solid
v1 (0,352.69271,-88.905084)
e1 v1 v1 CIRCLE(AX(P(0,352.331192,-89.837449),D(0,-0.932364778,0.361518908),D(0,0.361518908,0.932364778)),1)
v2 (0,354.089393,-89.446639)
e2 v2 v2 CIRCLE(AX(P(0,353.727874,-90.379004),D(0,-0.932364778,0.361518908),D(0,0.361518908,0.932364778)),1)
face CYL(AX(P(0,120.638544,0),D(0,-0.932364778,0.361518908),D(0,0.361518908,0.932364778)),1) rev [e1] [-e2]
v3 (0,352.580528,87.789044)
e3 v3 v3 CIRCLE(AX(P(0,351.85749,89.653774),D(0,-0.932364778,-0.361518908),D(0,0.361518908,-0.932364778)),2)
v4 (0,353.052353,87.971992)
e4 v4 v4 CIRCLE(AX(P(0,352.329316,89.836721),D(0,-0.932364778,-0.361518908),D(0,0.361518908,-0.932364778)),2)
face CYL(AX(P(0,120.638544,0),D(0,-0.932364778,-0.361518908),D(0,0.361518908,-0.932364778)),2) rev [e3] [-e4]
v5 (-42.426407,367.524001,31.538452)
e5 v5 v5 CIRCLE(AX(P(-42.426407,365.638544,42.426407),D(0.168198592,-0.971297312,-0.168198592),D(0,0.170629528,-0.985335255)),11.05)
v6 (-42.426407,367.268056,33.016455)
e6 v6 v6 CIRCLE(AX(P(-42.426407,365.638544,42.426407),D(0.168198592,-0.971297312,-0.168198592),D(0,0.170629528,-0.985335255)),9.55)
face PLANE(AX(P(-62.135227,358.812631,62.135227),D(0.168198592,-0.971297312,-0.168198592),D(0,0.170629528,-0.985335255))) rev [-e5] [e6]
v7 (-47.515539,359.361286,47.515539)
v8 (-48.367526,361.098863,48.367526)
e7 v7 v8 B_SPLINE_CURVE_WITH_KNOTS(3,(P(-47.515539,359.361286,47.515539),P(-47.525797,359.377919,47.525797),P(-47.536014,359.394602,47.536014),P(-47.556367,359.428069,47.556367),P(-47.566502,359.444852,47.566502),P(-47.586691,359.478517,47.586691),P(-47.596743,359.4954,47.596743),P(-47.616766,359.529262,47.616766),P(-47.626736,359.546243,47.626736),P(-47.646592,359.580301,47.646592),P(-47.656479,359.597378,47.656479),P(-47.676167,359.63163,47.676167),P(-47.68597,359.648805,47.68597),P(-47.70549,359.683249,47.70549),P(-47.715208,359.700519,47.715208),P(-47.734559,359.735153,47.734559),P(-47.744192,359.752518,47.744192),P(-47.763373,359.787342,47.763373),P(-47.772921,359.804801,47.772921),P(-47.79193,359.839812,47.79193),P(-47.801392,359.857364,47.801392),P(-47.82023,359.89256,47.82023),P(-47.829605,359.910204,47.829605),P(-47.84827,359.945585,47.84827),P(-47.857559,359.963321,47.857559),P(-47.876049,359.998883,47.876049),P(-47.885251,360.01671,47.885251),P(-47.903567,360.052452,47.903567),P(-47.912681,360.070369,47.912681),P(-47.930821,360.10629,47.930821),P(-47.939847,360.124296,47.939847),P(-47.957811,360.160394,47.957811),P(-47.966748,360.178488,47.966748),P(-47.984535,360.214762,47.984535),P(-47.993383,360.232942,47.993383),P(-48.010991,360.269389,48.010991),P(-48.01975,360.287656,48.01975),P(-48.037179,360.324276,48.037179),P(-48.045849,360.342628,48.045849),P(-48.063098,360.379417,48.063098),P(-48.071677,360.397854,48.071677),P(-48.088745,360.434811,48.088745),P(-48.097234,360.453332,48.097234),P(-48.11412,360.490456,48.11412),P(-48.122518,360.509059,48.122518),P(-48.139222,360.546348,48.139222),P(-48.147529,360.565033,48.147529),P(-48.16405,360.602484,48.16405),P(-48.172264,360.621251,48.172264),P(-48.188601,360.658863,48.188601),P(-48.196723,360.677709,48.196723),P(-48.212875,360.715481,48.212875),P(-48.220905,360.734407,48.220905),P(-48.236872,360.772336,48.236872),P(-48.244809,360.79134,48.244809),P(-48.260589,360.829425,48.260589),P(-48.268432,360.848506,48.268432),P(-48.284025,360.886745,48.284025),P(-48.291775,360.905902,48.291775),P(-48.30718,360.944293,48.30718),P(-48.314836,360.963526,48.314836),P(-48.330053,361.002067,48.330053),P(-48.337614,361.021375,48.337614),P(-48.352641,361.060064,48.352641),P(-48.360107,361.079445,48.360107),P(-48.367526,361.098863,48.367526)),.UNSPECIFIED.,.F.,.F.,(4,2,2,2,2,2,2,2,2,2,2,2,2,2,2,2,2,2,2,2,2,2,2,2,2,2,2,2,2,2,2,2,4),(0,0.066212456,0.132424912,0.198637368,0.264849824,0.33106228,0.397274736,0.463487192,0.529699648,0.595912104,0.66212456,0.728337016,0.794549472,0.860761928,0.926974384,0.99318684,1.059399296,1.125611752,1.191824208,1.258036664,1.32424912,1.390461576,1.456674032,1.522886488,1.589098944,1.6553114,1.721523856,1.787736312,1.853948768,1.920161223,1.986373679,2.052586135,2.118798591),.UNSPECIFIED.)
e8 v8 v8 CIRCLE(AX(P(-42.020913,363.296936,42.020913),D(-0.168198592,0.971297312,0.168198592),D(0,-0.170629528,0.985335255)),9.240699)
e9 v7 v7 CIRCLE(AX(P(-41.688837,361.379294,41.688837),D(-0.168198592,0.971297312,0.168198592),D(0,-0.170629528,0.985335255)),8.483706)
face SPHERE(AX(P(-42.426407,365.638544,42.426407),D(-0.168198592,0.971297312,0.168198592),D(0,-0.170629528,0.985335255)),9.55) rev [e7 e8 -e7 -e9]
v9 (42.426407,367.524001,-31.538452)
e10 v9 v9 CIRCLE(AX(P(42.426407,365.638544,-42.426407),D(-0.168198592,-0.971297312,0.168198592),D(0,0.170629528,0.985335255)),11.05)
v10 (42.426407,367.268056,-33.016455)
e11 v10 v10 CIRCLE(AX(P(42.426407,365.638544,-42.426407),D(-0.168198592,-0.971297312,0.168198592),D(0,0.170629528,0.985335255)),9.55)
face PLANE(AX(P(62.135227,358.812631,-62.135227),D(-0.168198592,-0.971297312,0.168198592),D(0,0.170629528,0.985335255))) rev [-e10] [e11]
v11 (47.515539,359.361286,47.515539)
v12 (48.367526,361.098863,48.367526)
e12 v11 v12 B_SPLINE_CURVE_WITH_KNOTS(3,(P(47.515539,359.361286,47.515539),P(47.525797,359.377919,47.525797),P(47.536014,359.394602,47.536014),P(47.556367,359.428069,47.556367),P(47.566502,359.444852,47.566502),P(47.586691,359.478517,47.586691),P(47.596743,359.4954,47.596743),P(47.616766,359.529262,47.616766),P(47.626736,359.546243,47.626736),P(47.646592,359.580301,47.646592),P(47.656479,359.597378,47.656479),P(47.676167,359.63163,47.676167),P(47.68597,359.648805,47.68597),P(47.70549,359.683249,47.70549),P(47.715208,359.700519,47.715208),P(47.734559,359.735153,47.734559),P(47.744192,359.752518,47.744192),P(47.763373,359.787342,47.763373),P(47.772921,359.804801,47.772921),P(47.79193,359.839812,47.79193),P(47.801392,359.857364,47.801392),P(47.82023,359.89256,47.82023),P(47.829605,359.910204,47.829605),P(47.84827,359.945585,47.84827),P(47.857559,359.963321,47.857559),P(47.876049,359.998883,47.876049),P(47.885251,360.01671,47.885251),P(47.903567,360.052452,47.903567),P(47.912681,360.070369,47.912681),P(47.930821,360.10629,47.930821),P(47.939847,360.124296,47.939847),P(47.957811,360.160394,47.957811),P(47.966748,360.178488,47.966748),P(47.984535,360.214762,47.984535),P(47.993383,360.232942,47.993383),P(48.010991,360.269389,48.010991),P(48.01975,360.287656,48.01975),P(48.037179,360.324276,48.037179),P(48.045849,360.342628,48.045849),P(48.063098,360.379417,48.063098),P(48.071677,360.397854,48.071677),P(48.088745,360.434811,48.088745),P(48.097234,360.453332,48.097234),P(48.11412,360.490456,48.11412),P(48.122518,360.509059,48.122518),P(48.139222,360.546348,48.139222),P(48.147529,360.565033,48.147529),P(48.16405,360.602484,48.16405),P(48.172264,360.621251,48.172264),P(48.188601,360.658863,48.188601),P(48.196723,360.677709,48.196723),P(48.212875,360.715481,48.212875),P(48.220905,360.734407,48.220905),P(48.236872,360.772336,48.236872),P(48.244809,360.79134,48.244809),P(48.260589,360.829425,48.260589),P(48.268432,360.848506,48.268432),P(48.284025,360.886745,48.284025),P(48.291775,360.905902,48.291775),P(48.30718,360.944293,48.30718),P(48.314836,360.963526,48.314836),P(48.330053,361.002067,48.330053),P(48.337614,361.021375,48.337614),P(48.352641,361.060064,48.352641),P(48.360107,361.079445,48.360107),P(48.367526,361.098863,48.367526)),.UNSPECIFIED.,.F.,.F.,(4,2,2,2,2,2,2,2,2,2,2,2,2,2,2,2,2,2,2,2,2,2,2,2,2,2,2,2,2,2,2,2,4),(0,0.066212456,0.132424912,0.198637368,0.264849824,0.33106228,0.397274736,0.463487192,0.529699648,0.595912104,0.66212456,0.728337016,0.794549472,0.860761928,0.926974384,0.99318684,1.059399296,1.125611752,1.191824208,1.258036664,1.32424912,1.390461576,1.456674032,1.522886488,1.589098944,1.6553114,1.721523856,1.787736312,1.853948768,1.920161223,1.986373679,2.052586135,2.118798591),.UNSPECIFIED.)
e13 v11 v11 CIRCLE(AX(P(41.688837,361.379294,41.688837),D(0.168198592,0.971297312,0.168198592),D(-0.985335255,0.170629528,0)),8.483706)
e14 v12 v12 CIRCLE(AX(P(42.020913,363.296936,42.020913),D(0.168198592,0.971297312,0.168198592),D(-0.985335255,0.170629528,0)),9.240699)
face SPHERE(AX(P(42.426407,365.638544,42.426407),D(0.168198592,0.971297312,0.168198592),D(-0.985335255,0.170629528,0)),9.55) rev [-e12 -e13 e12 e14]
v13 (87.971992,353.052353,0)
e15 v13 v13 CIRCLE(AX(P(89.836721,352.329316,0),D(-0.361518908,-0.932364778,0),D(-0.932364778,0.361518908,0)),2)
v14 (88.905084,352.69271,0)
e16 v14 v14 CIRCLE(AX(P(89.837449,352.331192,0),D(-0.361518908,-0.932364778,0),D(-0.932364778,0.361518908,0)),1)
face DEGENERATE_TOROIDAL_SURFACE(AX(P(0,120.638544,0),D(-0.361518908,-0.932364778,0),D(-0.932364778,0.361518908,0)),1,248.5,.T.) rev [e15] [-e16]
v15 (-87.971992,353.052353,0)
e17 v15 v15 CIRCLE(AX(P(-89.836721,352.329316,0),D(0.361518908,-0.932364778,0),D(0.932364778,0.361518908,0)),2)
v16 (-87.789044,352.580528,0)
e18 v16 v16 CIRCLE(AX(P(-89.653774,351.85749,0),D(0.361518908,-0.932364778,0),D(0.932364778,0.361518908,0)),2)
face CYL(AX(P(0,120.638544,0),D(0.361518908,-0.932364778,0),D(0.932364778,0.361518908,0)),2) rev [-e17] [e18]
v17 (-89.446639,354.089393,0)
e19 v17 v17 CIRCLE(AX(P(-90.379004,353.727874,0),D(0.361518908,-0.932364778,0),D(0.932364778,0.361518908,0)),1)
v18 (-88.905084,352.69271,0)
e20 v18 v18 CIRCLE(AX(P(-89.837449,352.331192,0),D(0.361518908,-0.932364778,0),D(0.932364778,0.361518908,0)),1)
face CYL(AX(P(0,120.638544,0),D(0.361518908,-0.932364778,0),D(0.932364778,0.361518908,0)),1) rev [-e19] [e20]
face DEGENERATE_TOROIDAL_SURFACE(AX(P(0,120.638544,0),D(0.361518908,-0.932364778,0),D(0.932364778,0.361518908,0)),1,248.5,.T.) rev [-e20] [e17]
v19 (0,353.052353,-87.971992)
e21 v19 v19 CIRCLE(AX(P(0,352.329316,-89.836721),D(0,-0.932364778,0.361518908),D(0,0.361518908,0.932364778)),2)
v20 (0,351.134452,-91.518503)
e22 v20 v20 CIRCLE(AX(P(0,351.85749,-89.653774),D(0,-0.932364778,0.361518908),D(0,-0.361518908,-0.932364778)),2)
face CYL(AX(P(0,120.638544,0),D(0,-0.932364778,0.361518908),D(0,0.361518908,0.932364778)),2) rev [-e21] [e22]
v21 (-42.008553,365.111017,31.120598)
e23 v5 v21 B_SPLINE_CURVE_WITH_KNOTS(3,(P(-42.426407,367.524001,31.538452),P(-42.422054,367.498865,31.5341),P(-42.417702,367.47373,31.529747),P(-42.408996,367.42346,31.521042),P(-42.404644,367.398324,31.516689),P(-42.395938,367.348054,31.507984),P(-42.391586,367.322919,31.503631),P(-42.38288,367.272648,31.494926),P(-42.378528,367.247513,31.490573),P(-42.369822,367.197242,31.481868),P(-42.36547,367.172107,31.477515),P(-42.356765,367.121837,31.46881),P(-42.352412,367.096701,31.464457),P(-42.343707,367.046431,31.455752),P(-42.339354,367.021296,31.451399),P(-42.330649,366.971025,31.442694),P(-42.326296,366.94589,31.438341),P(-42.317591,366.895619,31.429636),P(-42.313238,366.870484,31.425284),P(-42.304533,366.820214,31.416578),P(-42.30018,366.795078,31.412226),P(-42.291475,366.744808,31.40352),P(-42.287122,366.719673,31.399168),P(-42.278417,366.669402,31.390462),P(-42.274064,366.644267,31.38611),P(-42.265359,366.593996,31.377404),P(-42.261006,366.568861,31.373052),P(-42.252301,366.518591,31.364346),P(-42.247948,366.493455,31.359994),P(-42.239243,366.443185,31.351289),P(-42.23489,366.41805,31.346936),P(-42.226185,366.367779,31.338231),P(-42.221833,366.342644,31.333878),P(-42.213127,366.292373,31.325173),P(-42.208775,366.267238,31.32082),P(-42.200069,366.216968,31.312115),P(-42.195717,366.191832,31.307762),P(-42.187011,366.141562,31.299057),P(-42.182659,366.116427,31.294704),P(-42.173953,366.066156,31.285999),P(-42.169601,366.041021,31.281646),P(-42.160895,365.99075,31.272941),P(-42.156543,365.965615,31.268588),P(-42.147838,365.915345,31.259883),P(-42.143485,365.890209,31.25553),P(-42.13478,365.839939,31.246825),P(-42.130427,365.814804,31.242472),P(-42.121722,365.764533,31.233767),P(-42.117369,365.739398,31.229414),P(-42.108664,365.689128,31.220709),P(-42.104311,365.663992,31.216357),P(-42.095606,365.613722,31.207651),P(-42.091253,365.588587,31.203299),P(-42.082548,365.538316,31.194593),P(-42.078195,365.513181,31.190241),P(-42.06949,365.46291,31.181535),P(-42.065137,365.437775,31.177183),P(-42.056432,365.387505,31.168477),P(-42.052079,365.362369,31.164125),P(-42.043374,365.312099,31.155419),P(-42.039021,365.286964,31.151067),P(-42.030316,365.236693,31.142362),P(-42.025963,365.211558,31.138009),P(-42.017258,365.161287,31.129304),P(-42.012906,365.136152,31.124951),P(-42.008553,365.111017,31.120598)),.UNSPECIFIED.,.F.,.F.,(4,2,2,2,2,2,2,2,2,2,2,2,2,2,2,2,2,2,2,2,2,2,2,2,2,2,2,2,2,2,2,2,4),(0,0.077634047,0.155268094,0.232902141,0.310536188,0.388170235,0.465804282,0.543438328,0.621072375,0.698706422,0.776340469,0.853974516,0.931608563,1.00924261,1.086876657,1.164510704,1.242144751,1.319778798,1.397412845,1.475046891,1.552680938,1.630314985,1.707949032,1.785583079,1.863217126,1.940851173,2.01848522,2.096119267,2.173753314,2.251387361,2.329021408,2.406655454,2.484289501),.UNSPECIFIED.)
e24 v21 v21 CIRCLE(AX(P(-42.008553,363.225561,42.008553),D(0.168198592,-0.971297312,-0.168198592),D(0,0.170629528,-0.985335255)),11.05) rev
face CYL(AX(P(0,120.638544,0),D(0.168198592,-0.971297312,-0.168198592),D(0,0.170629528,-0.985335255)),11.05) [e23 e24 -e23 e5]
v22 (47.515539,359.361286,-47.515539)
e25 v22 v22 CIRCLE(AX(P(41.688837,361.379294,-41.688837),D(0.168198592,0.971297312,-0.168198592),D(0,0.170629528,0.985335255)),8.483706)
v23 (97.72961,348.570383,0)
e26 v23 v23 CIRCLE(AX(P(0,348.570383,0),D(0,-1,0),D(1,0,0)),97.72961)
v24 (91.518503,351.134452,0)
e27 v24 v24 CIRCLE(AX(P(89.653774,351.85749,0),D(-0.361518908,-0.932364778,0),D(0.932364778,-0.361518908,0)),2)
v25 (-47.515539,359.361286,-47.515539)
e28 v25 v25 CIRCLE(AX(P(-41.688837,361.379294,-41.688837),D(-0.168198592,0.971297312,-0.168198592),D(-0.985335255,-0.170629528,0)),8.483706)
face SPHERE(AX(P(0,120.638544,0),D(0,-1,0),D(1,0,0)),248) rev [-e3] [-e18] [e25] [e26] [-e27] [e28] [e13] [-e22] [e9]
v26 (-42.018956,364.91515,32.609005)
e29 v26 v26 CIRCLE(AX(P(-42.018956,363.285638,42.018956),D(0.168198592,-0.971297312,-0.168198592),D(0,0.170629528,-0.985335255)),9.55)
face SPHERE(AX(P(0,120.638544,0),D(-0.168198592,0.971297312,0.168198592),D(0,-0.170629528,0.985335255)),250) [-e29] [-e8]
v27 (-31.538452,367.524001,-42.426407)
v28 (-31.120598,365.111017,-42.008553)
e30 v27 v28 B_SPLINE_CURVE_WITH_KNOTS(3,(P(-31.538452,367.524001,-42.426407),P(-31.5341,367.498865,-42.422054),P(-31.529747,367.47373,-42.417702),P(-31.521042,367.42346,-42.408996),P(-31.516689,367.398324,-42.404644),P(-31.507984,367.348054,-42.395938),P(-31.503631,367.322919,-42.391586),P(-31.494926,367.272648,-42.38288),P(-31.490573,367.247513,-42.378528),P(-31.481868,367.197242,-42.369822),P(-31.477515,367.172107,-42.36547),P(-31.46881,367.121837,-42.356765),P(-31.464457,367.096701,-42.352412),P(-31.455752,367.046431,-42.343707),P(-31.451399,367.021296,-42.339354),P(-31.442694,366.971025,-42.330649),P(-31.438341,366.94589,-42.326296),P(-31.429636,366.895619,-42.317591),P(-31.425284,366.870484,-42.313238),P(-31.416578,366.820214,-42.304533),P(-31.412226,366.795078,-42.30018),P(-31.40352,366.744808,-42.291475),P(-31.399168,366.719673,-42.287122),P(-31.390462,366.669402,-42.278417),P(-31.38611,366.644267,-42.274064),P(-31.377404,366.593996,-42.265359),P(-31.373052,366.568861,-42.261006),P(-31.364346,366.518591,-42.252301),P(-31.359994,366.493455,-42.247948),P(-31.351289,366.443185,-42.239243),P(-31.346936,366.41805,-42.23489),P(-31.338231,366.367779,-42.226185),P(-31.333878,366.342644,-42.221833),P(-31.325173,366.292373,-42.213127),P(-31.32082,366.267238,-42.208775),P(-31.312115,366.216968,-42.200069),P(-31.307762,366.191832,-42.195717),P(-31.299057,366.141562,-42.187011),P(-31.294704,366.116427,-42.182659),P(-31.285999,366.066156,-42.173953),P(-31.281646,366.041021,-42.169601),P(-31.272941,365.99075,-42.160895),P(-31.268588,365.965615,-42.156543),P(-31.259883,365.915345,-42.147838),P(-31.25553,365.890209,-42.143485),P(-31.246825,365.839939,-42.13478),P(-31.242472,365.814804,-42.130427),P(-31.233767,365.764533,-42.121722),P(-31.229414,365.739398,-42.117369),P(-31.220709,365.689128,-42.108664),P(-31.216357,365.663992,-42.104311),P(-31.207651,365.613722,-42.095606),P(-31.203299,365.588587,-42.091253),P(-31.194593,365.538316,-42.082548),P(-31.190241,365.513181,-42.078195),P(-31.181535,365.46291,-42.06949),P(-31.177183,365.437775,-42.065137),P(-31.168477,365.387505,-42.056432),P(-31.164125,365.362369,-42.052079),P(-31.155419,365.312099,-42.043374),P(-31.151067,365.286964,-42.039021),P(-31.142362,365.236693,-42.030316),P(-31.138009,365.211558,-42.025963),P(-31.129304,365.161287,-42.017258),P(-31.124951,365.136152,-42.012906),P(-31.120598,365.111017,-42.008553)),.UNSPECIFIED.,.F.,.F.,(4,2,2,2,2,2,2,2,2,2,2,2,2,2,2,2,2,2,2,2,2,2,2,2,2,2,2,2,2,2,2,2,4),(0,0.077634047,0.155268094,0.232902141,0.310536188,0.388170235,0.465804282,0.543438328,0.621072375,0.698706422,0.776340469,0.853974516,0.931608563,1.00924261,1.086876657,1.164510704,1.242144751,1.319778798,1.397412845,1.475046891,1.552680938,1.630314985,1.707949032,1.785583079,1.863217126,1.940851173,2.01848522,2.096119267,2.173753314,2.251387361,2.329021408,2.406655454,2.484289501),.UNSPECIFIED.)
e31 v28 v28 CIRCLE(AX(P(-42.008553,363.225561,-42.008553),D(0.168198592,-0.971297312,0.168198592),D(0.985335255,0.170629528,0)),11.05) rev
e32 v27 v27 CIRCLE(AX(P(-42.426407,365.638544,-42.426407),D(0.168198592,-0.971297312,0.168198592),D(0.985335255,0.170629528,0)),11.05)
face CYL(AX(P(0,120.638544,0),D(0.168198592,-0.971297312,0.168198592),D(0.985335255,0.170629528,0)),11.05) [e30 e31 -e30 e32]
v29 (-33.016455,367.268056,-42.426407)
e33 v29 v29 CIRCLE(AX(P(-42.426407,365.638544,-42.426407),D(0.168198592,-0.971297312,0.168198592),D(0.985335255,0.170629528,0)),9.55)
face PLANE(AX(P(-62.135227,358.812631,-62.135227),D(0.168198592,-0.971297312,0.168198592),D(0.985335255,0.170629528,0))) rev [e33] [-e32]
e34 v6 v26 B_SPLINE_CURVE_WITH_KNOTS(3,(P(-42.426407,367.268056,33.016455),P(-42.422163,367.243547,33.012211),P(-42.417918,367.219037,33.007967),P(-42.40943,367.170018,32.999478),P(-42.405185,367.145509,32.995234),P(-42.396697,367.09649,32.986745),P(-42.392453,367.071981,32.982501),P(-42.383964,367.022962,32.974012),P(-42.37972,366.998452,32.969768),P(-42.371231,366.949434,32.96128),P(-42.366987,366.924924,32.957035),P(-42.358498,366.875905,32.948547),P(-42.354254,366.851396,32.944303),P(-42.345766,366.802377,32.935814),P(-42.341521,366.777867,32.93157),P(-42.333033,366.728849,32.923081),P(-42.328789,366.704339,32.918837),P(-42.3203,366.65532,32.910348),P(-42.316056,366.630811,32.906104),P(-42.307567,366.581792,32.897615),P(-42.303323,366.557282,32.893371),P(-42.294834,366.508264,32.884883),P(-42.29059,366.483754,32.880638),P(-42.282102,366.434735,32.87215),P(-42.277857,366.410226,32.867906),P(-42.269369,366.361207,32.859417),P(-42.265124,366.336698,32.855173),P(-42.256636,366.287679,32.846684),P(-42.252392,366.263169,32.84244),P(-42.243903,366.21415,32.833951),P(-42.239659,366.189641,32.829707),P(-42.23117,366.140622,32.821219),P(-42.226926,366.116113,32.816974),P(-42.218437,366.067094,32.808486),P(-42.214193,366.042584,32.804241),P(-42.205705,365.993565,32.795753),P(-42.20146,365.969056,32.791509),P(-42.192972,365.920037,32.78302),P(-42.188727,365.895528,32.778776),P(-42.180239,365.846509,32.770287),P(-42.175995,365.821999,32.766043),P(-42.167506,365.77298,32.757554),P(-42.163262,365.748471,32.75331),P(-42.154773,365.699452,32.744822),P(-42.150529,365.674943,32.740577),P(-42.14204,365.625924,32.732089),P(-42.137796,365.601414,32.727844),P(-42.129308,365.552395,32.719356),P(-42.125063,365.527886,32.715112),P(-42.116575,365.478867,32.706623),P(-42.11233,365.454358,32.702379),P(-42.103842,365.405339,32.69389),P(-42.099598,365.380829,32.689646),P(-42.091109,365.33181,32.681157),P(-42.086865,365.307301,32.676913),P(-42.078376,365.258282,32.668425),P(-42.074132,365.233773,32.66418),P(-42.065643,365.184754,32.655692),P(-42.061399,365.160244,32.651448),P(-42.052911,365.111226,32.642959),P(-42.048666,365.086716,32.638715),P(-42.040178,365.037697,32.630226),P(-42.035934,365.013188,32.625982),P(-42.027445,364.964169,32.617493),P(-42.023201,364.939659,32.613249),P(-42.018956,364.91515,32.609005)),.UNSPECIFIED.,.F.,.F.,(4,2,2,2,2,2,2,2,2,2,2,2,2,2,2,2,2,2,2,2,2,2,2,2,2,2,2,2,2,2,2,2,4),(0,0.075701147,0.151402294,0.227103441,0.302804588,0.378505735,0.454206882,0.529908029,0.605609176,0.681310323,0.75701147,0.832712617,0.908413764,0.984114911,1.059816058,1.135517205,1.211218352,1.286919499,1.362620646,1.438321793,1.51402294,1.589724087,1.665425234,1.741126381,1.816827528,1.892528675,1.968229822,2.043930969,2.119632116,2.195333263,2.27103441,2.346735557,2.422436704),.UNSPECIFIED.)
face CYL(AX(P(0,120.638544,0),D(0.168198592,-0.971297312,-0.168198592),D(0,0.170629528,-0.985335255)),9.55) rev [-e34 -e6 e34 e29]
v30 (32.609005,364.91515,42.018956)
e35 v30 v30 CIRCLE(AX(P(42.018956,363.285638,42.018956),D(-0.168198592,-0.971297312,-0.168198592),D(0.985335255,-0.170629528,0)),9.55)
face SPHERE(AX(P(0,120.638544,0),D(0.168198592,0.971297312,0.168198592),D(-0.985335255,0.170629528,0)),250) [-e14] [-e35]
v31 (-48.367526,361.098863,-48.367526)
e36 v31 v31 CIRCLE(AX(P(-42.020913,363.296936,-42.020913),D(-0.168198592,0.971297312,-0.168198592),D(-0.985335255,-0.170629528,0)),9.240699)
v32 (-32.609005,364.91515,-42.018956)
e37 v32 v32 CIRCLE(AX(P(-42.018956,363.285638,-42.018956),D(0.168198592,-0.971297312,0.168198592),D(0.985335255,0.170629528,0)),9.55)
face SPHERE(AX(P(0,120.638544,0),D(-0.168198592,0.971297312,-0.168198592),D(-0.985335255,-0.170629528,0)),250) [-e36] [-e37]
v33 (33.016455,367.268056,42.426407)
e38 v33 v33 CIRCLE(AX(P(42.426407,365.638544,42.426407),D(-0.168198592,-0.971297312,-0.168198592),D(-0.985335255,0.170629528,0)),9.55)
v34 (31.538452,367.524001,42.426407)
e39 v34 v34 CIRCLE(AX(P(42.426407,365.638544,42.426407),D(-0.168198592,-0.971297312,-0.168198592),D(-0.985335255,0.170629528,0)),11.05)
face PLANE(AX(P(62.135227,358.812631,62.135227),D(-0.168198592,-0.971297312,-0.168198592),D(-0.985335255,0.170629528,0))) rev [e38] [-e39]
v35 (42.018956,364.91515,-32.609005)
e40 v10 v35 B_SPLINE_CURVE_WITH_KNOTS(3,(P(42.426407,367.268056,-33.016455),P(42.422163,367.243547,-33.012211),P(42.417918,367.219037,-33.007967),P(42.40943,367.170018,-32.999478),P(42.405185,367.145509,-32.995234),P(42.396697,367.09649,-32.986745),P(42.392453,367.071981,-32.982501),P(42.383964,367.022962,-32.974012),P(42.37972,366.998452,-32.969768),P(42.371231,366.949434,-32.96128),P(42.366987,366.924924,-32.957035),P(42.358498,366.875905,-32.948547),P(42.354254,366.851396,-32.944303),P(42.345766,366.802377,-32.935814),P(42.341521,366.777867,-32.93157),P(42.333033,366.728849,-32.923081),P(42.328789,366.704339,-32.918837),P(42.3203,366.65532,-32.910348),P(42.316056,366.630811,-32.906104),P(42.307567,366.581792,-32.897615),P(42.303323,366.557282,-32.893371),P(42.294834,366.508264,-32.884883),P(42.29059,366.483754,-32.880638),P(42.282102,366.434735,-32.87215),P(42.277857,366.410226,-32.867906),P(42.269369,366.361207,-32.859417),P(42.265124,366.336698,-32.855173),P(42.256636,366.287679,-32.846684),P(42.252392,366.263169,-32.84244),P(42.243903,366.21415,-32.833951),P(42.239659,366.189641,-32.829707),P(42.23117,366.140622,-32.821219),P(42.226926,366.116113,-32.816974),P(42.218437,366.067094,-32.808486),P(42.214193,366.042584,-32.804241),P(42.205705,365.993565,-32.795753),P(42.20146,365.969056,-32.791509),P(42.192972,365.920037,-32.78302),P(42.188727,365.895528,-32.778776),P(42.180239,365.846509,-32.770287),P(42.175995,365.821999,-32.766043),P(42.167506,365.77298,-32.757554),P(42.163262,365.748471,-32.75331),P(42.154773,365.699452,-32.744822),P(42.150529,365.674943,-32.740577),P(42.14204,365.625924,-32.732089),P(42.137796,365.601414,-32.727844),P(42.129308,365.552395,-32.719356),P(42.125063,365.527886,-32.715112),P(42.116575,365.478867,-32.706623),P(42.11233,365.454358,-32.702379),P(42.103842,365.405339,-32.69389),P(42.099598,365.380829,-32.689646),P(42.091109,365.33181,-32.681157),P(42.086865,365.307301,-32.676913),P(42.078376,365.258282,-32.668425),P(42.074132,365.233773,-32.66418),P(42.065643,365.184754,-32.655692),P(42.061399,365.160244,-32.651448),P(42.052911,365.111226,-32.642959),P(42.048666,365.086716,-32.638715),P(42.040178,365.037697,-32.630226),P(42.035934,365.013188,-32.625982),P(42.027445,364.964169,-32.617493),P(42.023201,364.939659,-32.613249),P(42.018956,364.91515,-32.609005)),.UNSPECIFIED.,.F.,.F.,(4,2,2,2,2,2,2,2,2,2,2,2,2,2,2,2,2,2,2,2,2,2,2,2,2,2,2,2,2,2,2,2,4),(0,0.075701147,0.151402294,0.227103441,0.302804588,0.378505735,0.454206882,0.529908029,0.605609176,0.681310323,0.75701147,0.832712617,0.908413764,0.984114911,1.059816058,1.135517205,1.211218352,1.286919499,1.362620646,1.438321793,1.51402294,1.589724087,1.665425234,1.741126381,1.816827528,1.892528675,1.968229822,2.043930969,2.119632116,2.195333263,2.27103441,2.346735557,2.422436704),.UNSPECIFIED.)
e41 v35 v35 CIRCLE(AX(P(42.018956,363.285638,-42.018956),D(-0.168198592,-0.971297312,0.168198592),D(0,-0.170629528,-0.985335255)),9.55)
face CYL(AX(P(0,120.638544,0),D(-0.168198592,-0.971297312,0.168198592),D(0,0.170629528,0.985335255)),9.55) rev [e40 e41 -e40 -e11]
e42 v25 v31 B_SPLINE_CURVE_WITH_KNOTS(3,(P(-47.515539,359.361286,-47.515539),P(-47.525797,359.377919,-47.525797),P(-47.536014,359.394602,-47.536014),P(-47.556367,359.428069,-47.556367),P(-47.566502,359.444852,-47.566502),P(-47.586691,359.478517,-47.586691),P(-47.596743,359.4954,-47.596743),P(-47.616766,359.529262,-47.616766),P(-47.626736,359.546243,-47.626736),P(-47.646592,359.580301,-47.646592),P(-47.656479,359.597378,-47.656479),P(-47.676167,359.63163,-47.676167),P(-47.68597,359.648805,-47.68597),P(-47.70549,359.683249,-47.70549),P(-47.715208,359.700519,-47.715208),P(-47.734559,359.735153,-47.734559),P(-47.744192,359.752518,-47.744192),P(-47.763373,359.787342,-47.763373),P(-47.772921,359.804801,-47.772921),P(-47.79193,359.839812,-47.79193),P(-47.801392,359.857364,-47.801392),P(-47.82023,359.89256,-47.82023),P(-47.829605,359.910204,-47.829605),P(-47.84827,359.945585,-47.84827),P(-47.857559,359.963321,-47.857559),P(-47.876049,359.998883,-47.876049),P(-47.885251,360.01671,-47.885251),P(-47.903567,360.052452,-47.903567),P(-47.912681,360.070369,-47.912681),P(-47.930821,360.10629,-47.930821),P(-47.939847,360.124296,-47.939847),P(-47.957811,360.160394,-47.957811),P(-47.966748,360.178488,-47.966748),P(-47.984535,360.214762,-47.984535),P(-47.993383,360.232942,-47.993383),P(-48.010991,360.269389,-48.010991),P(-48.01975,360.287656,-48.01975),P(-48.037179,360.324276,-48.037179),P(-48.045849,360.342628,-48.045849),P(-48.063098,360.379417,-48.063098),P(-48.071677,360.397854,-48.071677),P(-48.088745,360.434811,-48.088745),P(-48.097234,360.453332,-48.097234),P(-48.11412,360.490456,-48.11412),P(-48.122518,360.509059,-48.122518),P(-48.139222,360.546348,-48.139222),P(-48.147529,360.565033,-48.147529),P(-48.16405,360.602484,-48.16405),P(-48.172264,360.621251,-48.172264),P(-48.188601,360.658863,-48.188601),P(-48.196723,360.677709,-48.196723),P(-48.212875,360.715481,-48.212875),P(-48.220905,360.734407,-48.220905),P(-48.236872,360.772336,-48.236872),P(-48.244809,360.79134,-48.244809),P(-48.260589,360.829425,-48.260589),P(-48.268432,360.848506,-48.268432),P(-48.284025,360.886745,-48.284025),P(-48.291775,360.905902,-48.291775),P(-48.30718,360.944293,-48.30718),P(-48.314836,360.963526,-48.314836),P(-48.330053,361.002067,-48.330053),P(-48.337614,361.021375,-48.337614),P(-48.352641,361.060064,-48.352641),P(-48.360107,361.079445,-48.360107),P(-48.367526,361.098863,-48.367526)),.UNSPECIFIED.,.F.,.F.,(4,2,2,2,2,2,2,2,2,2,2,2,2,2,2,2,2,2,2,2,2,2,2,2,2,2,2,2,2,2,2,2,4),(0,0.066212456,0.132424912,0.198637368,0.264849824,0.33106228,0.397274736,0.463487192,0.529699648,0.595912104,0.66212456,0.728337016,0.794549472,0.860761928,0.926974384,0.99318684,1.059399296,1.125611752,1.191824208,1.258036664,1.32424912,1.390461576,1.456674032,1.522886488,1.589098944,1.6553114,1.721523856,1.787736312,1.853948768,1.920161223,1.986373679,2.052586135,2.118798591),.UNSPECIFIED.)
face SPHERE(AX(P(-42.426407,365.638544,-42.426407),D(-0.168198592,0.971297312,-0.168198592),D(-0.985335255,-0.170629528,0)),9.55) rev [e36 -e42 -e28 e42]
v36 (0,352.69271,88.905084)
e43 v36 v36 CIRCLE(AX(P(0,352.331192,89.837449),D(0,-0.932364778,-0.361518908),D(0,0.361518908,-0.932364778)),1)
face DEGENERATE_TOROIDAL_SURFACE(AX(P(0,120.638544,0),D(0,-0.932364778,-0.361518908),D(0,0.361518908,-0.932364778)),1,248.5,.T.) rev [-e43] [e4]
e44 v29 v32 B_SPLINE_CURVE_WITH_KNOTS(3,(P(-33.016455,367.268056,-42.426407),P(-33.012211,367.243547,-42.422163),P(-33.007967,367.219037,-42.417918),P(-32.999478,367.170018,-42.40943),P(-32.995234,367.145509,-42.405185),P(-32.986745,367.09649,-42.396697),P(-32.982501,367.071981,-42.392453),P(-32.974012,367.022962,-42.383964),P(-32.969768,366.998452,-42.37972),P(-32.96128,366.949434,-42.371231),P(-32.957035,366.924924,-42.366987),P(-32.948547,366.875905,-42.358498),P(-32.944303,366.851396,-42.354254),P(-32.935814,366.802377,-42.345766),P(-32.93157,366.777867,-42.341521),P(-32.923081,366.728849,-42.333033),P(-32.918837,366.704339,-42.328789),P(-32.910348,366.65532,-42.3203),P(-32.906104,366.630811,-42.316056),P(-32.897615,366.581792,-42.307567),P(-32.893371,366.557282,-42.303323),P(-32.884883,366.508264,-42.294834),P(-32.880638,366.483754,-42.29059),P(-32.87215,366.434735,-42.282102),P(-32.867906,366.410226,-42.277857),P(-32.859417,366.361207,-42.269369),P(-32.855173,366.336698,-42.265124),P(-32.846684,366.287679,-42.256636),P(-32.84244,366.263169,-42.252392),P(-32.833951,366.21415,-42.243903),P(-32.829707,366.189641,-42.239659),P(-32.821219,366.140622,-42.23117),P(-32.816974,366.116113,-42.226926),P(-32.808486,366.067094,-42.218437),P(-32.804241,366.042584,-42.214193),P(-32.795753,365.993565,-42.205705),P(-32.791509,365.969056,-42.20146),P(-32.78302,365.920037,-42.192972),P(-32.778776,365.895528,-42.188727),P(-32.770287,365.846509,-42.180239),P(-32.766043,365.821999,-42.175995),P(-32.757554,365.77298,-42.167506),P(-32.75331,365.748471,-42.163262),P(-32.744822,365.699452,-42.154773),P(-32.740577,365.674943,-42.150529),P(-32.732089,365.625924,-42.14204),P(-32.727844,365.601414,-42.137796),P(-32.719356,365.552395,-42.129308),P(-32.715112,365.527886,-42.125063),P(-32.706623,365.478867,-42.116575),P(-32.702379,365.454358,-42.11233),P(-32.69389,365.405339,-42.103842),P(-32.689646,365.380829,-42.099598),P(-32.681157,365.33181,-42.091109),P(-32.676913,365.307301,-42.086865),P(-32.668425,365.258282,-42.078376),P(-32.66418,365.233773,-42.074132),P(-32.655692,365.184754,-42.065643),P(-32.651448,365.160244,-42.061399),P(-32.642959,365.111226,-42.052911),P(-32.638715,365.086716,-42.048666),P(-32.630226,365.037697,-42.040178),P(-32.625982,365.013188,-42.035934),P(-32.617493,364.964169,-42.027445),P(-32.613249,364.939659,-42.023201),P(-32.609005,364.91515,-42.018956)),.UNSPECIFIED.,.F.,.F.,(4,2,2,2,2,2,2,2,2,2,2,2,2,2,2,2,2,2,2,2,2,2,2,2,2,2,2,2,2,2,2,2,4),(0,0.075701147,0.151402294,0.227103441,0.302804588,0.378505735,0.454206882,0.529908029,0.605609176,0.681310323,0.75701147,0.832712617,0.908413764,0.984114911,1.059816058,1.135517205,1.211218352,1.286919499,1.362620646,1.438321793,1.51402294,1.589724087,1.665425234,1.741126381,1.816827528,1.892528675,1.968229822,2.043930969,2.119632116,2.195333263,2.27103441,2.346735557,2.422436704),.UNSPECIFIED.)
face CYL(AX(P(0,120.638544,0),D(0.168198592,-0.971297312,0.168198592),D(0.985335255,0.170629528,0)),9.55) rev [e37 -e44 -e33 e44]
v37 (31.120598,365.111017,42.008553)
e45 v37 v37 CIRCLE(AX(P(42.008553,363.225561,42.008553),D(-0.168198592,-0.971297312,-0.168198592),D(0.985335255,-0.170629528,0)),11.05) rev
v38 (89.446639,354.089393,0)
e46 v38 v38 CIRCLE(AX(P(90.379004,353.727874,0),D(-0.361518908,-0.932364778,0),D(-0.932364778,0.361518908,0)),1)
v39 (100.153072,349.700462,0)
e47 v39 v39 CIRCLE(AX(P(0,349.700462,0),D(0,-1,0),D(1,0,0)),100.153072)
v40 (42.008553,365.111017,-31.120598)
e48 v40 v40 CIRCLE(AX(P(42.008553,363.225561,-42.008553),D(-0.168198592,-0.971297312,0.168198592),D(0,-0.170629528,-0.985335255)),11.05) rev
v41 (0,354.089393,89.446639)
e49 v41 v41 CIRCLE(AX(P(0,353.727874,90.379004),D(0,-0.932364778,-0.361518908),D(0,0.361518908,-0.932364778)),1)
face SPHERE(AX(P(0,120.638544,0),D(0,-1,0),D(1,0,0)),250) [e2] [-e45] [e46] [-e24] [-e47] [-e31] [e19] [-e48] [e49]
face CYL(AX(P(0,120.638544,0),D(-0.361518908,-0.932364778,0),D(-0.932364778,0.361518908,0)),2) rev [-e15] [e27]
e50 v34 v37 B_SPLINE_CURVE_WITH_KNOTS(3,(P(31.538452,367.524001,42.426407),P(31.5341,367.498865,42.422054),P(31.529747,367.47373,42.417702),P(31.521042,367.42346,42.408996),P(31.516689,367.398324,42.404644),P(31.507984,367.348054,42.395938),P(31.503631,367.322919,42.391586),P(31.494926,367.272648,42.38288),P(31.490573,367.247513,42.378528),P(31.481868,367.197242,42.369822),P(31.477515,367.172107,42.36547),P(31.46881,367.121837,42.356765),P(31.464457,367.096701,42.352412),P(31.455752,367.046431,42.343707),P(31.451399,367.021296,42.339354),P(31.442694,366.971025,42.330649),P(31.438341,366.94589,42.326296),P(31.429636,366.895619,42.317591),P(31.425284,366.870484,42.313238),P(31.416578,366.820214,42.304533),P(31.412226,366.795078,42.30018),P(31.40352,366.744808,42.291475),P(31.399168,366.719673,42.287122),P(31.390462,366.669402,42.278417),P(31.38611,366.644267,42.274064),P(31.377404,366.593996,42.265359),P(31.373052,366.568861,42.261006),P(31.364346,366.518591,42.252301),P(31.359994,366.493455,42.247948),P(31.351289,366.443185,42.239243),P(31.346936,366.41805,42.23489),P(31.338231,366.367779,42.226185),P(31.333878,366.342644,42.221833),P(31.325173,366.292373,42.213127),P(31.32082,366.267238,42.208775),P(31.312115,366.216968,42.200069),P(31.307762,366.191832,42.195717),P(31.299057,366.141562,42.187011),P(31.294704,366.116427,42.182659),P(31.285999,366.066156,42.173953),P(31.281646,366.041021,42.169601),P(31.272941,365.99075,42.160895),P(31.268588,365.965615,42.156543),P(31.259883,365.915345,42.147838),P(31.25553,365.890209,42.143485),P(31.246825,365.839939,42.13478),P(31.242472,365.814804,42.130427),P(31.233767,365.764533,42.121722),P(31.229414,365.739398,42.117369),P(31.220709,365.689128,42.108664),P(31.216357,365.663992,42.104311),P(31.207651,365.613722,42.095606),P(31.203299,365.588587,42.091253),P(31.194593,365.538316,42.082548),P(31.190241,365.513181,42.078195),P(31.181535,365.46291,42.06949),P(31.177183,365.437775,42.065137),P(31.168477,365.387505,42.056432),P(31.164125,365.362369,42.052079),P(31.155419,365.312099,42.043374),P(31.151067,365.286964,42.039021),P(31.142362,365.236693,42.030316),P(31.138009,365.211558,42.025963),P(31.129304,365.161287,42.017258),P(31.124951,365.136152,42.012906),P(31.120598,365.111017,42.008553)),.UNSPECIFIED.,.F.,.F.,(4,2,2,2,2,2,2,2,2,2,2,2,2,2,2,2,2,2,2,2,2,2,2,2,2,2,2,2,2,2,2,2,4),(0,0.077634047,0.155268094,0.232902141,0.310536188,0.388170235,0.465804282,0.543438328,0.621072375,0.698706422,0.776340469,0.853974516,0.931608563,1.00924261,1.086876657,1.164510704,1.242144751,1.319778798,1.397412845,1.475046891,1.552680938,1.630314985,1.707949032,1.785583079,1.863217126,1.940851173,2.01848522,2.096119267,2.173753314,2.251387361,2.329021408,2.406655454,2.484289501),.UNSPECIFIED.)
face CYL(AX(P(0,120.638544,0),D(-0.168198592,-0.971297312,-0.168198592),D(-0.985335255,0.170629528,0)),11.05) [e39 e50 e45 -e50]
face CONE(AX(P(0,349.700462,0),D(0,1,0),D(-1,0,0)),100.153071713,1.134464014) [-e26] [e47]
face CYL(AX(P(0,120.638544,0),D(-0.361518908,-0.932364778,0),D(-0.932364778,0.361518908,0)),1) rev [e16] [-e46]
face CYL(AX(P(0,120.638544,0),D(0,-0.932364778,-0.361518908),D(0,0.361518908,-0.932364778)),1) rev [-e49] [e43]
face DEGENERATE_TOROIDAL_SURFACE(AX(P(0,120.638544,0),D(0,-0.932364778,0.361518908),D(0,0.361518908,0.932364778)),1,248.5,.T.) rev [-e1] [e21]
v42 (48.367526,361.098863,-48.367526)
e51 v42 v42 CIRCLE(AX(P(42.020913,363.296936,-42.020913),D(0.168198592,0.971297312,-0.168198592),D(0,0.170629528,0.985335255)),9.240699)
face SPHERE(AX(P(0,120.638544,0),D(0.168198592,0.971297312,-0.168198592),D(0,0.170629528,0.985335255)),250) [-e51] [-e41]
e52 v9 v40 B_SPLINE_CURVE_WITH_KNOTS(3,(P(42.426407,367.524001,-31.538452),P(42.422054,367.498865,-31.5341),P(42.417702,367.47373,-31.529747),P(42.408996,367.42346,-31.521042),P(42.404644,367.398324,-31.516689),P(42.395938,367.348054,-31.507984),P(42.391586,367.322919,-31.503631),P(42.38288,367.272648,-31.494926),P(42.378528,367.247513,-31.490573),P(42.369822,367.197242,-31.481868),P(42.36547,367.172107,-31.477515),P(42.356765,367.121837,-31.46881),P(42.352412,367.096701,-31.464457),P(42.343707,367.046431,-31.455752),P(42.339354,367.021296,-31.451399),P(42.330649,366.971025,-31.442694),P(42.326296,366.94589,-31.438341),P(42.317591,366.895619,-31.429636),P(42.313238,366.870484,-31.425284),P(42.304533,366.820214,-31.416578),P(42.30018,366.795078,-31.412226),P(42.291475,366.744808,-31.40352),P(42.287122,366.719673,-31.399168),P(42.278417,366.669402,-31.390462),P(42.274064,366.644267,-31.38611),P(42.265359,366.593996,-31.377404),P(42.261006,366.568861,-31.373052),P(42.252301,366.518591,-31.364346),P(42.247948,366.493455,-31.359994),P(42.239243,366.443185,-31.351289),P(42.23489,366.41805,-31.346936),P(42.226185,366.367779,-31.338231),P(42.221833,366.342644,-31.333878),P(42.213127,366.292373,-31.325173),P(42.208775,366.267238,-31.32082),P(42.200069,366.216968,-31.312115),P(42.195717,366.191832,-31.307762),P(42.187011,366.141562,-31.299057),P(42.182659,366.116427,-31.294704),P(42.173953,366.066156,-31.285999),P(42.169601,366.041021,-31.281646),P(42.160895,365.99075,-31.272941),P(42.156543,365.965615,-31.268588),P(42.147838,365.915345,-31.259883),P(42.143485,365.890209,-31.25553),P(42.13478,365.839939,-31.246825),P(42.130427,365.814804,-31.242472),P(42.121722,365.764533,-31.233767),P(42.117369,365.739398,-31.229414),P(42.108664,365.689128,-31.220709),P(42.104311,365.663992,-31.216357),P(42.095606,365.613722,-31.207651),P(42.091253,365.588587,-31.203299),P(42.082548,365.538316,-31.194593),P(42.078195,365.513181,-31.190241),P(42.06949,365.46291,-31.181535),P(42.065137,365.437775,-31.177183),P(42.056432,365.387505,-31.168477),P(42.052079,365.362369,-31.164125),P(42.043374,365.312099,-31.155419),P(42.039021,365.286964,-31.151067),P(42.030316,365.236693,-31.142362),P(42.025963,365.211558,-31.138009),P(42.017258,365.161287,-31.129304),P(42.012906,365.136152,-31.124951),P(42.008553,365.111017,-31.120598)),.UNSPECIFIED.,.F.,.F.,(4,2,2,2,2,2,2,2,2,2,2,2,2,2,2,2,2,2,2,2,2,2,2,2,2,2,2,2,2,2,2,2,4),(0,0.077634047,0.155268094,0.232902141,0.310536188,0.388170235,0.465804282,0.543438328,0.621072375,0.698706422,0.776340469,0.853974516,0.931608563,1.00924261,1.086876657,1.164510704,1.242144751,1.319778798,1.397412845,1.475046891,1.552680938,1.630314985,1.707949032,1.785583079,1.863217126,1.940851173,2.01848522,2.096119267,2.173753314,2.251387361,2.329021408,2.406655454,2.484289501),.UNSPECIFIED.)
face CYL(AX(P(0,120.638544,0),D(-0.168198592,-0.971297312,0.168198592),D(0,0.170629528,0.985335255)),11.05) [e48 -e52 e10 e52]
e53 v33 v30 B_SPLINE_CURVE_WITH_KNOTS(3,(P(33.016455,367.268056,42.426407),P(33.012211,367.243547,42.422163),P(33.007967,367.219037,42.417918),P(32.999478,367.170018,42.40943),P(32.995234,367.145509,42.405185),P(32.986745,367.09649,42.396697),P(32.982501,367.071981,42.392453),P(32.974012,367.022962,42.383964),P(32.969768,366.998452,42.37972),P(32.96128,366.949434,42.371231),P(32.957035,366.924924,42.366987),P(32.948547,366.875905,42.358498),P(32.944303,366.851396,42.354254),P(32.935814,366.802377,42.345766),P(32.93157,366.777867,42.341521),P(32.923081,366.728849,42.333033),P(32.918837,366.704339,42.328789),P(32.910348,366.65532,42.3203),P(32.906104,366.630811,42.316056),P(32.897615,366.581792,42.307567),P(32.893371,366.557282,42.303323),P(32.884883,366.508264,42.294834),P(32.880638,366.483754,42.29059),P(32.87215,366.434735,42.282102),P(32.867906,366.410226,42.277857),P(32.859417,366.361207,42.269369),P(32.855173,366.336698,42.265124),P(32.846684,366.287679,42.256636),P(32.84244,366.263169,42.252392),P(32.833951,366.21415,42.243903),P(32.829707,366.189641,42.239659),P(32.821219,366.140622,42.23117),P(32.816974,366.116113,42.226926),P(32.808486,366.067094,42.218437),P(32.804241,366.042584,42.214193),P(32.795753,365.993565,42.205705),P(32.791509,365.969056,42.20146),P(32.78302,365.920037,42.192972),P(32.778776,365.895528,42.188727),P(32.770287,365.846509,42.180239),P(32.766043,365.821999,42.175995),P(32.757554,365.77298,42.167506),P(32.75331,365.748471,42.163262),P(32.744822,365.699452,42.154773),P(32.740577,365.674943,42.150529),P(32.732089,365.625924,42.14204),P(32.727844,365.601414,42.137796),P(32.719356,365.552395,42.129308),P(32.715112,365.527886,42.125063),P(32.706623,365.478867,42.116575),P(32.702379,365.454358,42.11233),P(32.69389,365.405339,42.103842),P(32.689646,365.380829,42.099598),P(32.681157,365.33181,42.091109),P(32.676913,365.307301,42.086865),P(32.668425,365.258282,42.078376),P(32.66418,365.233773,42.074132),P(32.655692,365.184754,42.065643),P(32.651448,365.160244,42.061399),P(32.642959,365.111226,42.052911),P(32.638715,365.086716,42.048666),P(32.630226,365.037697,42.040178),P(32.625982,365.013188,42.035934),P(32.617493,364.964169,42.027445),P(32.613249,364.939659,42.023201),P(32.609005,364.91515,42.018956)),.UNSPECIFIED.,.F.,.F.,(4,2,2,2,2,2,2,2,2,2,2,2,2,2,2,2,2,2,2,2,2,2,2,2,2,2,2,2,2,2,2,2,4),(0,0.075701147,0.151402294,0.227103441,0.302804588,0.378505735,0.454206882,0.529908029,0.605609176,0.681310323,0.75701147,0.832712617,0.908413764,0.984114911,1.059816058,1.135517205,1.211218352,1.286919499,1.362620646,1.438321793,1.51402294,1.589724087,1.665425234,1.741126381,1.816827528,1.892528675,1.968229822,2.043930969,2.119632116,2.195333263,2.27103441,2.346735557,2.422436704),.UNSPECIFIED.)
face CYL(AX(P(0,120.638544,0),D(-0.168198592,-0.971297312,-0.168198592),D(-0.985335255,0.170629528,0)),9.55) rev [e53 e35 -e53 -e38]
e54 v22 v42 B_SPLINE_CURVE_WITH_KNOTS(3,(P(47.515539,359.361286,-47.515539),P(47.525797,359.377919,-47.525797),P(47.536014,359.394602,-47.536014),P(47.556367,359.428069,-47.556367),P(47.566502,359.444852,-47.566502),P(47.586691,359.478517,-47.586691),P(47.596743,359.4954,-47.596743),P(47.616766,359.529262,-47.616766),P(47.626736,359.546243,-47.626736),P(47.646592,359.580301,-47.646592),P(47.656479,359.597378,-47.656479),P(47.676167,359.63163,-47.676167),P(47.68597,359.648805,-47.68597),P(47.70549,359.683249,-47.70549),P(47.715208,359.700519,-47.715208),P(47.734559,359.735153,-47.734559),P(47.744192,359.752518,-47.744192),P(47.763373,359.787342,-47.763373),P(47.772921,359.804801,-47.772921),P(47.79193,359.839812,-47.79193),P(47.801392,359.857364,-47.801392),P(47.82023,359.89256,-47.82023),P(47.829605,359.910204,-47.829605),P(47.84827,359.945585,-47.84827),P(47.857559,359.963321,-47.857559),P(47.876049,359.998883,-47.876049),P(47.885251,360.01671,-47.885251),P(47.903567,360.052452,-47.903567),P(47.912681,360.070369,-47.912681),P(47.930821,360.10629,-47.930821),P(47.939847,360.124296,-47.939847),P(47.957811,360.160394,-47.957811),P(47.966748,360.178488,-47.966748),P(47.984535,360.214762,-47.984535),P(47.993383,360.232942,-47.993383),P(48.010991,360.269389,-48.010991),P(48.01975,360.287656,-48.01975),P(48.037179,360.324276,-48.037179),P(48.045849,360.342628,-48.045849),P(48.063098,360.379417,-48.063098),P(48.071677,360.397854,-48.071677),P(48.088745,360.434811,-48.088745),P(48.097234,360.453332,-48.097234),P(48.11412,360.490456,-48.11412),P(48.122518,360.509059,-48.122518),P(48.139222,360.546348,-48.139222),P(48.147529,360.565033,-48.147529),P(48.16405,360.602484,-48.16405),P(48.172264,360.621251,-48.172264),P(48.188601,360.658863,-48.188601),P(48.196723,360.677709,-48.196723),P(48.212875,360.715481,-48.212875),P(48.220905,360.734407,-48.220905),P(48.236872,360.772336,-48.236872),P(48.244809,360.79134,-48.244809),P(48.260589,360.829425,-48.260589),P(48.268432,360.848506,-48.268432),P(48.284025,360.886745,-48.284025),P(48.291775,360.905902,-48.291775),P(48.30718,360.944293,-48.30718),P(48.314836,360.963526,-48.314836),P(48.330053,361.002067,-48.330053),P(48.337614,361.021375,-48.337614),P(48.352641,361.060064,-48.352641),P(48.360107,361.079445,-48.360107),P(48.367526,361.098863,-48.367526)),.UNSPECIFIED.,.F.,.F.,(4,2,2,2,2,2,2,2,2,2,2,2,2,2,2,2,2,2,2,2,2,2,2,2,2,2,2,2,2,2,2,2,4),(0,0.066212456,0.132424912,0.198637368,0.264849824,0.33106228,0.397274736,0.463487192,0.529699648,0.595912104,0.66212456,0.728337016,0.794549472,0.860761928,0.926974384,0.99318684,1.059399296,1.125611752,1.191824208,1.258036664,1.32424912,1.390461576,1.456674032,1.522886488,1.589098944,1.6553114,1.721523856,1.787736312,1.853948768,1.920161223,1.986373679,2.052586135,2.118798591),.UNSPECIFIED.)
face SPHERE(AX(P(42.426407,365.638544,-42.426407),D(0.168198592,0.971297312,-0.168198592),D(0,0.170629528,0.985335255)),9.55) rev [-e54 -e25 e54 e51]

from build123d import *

# Parameters (mm, degrees)
CIRPATTERN2_COUNT = 4
CIRPATTERN3_COUNT = 4


with BuildPart() as part:
    # Sketch1 → Revolve1 (revolve)
    with BuildSketch(Plane.XY):
        with BuildLine():
            ThreePointArc((-96.450372245, 351.283998775), (-98.304910564, 350.499686156), (-100.153071713, 349.700462136))
            Line((-100.153071713, 349.700462136), (-97.729610096, 348.570383425))
            ThreePointArc((-97.729610096, 348.570383425), (-49.884385754, 363.569703341), (0, 368.638544248))
            Line((0, 368.638544248), (0, 370.638544248))
            ThreePointArc((0, 370.638544248), (-49.186565078, 365.752154266), (-96.450372245, 351.283998775))
        make_face()
    revolve(axis=Axis((0, 394.944466532, 0), (0, 1, 0)))

    # Sketch3 → Cut-Revolve1 (revolve, cut)
    with BuildSketch(Plane.XY):
        with BuildLine():
            ThreePointArc((-89.446639152, 354.089392918), (-89.913362889, 353.910032378), (-90.37972697, 353.729738747))
            Line((-90.37972697, 353.729738747), (-89.295170247, 350.932644413))
            ThreePointArc((-89.295170247, 350.932644413), (-88.362065993, 351.292278867), (-87.427513364, 351.648132593))
            Line((-87.427513364, 351.648132593), (-87.971991647, 353.052353403))
            ThreePointArc((-87.971991647, 353.052353403), (-88.438718646, 352.873001309), (-88.905083831, 352.692710488))
            Line((-88.905083831, 352.692710488), (-89.446639152, 354.089392918))
        make_face()
    cut_revolve1 = revolve(axis=Axis((0, 120.638544248, 0), (-0.3615189078815354, 0.9323647779941829, 0)), mode=Mode.SUBTRACT)

    # CirPattern2: Cut-Revolve1 ×4 about axis
    cirpattern2_axis = Axis((0, 0, 0), (0, 1, 0))
    for i in range(1, CIRPATTERN2_COUNT):
        add(cut_revolve1.rotate(cirpattern2_axis, i * 360 / CIRPATTERN2_COUNT), mode=Mode.SUBTRACT)

    # Sketch5 → Cut-Revolve5 (revolve, cut)
    with BuildSketch(Plane(origin=(0, 0, 0), x_dir=(0, 1, 0), z_dir=(0.7071067811865488, 0, 0.7071067811865464))):
        with BuildLine():
            ThreePointArc((356.088544248, 60), (365.638544248, 50.45), (375.188544248, 60))
            Line((375.188544248, 60), (356.088544248, 60))
        make_face()
    cut_revolve5 = revolve(axis=Axis((-42.426406871, 356.088544248, 42.426406871), (0, -1, 0)), mode=Mode.SUBTRACT)

    # Sketch5<9> → Revolve3 (revolve)
    with BuildSketch(Plane(origin=(0, 0, 0), x_dir=(0, 1, 0), z_dir=(0.7071067811865488, 0, 0.7071067811865464))):
        Polygon((360.346185197, 68.536122954), (363.366897883, 69.275889326), (363.010094789, 70.732835294), (360.597111075, 70.141900506), (359.989382103, 69.993068922), align=None)
    revolve3 = revolve(axis=Axis((0, 120.638544248, 0), (-0.1681985915763013, 0.9712973116319725, 0.16819859157630185)))

    # CirPattern3: Cut-Revolve5, Revolve3 ×4 about axis
    cirpattern3_axis = Axis((0, 0, 0), (0, 1, 0))
    add([cut_revolve5.rotate(cirpattern3_axis, i * 360 / CIRPATTERN3_COUNT) for i in range(1, CIRPATTERN3_COUNT)], mode=Mode.SUBTRACT)
    add([revolve3.rotate(cirpattern3_axis, i * 360 / CIRPATTERN3_COUNT) for i in range(1, CIRPATTERN3_COUNT)])


solid = part.part
